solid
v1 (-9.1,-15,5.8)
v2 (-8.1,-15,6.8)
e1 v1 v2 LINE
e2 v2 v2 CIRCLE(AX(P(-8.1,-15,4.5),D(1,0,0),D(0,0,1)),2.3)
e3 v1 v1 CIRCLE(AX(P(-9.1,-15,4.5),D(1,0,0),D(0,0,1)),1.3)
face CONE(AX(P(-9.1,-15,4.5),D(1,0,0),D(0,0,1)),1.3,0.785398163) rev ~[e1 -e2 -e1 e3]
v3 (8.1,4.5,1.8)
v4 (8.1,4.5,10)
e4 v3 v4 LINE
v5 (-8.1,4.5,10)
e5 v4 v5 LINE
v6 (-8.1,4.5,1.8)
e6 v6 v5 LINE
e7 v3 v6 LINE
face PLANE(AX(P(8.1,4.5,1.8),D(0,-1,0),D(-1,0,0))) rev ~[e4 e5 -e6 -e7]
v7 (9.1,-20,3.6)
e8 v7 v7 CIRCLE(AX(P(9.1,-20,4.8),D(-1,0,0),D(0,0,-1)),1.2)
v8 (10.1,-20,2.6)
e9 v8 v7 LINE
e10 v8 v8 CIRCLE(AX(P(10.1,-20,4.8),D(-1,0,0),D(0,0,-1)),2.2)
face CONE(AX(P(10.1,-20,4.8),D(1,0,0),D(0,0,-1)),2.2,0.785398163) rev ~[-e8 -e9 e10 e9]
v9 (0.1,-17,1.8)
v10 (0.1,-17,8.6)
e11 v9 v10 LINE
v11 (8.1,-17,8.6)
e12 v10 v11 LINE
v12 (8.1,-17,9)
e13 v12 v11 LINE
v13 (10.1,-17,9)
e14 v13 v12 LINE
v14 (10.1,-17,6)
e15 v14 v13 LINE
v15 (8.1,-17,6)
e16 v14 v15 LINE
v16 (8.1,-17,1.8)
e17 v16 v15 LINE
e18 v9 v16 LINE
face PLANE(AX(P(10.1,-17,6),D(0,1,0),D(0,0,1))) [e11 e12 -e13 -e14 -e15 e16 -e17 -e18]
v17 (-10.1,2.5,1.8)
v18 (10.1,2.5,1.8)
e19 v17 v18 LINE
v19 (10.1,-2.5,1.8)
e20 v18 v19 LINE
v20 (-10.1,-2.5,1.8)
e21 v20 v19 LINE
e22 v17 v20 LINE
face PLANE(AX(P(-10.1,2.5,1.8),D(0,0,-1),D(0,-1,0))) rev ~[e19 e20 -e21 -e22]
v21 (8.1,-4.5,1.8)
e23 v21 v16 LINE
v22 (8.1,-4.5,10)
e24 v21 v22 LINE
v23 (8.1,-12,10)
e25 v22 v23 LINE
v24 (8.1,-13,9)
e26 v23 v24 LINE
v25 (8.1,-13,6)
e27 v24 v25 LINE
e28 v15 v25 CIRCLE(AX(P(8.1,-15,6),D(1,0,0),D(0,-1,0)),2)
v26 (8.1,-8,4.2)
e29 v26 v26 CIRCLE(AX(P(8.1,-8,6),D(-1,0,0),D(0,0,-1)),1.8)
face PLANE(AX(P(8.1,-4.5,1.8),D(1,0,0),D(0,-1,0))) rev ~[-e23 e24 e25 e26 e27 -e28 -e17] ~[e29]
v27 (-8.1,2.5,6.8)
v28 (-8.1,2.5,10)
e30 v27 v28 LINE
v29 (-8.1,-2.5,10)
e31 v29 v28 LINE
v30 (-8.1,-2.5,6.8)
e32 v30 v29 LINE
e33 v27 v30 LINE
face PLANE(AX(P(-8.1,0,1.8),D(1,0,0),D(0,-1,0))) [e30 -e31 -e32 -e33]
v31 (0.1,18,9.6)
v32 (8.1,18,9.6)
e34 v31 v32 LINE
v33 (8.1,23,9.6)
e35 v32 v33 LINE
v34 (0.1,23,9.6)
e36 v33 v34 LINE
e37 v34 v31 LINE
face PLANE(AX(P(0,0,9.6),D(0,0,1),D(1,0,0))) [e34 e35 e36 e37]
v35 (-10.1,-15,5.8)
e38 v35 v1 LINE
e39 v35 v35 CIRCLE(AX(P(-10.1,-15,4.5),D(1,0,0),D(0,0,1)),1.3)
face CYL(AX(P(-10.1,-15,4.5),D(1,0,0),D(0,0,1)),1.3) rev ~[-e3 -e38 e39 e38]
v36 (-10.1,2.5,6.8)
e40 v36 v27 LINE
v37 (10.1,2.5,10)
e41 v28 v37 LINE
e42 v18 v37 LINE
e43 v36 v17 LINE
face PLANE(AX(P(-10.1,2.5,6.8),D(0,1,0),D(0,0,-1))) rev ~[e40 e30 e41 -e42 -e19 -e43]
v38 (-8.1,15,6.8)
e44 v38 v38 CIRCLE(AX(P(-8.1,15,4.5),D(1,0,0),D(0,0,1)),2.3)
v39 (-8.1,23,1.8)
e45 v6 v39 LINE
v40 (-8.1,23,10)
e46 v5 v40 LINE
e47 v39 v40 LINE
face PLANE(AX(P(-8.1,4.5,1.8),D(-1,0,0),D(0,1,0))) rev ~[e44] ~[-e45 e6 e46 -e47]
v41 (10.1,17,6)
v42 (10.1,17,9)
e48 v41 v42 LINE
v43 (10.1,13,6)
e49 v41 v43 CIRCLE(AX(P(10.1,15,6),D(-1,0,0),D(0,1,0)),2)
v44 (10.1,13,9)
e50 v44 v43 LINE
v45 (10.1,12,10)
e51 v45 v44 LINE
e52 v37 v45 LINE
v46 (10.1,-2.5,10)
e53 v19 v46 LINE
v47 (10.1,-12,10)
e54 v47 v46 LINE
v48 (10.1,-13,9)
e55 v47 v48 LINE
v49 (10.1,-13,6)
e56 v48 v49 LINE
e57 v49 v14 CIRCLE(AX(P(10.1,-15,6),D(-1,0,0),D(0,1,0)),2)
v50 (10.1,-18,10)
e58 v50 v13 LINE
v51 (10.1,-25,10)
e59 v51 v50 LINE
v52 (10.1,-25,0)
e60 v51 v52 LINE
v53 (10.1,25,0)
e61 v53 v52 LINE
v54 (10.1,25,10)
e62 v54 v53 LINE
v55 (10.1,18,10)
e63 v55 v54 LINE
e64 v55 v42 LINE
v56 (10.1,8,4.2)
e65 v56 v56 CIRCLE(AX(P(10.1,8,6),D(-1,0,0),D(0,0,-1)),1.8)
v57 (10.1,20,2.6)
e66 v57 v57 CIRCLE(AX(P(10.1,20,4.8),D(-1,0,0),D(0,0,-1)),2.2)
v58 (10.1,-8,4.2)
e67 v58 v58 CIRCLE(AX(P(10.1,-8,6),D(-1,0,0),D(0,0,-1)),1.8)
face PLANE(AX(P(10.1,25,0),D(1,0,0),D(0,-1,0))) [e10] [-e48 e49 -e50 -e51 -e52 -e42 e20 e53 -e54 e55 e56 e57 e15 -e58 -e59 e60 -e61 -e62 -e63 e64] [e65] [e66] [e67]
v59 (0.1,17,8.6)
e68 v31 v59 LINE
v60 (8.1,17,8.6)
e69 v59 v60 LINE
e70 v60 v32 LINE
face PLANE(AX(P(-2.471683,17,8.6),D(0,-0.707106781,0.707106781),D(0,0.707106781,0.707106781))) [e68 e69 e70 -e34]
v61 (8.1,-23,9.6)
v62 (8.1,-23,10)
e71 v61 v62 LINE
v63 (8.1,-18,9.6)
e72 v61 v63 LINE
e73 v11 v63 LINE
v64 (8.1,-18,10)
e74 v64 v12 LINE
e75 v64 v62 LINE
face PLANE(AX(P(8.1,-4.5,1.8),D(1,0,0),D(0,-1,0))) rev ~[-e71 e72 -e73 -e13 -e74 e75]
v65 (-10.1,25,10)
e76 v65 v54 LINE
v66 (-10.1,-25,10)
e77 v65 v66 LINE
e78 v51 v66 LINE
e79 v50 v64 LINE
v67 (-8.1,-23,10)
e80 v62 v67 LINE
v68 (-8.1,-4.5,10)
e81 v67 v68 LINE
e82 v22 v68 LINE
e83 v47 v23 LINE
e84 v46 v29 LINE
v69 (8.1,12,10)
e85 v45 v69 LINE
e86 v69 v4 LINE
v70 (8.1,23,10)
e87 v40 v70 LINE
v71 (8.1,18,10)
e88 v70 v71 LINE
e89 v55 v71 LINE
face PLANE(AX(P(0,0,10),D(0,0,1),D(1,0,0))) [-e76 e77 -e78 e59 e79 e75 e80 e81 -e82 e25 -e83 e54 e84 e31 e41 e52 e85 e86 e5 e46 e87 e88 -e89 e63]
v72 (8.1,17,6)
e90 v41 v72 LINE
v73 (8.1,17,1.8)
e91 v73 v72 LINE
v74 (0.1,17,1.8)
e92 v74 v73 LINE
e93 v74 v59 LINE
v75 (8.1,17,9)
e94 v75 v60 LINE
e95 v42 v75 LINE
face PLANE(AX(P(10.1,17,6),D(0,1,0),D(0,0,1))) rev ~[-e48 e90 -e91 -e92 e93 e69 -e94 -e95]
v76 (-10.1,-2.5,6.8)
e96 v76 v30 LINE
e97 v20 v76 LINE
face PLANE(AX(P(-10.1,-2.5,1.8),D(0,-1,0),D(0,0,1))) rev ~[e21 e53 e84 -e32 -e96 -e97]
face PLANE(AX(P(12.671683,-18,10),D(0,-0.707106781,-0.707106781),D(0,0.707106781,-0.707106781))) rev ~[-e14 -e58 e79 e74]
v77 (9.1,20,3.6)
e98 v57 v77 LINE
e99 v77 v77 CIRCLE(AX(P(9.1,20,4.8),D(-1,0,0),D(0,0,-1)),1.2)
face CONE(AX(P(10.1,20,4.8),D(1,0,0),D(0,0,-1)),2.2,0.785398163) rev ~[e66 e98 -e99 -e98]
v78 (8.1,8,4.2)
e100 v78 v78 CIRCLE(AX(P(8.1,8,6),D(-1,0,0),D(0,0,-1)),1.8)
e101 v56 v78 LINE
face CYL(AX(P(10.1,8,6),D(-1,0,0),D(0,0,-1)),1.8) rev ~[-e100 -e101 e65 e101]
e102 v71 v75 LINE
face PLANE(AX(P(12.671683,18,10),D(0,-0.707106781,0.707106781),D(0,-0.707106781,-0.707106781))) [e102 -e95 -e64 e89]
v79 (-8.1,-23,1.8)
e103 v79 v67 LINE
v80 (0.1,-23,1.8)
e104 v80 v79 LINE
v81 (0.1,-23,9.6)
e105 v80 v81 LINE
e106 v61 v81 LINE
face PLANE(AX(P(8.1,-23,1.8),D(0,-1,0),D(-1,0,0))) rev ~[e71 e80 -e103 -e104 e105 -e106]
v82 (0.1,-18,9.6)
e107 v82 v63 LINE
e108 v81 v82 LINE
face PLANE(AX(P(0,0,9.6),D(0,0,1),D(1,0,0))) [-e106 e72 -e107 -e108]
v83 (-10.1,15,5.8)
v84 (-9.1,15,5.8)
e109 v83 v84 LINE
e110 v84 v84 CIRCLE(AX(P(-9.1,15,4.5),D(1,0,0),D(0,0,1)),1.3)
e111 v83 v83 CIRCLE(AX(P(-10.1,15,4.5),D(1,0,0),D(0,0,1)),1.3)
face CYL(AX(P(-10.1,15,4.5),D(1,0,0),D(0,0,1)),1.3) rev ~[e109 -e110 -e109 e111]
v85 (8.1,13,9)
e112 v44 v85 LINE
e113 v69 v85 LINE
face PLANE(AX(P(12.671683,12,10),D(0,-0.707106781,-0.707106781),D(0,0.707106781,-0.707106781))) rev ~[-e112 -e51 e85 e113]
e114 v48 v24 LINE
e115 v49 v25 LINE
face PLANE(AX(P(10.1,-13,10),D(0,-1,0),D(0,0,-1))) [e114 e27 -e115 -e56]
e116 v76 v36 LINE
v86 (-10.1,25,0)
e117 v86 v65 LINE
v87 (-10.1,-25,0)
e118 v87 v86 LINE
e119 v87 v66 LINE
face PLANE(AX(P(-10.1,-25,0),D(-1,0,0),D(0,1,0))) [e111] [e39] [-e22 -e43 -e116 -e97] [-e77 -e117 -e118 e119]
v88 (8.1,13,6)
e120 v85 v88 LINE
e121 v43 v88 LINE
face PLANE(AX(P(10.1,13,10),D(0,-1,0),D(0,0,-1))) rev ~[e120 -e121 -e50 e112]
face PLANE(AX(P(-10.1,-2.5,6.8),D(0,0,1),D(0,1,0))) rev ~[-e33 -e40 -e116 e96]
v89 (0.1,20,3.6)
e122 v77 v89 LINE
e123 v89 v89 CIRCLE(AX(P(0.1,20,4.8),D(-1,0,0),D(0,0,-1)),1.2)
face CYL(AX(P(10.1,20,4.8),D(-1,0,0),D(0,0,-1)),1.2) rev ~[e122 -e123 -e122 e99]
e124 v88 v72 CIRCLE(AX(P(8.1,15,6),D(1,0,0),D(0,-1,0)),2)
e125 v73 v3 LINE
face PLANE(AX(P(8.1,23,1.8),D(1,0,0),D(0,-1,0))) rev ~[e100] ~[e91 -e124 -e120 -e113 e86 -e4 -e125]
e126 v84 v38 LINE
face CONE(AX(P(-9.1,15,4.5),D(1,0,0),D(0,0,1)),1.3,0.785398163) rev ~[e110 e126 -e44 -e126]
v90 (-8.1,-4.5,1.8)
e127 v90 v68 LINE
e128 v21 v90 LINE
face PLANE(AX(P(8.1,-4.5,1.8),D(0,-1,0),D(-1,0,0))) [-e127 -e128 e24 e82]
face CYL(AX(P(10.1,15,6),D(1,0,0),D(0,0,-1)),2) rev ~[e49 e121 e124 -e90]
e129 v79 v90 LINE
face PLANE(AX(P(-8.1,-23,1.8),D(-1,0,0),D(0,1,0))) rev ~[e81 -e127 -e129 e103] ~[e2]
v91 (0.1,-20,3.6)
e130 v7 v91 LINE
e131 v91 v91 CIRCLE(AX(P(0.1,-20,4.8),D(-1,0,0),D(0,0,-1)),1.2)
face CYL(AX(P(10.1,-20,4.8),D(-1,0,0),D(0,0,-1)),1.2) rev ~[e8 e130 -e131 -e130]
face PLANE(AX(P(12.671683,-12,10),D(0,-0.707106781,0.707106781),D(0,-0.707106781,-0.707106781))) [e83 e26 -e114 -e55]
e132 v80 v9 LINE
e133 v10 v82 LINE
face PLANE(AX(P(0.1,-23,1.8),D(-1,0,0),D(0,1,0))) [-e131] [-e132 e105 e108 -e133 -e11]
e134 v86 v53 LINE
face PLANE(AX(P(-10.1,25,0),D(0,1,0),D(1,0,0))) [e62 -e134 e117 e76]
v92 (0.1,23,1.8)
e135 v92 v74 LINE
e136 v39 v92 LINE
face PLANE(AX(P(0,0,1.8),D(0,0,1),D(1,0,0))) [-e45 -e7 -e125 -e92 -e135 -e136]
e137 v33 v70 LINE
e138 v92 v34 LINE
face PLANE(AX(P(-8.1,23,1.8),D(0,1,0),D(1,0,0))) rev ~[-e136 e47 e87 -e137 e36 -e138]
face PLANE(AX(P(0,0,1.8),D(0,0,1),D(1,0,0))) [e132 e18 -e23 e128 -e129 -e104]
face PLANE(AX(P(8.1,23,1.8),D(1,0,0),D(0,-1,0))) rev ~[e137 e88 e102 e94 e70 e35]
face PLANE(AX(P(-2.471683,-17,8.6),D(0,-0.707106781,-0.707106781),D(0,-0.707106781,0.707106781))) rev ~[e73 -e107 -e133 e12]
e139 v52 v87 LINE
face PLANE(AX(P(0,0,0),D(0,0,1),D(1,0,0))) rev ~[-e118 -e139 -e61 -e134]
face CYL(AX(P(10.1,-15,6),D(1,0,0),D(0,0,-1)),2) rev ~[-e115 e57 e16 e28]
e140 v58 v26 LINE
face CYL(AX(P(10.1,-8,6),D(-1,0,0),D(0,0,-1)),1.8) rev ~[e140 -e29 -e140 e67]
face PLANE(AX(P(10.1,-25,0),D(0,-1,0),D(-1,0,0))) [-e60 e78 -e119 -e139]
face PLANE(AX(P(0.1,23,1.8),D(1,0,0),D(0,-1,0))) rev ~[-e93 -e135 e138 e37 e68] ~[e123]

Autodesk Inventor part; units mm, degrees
ref_plane "YZ Plane" through (0, 0, 0) normal (1, 0, 0) x (0, 1, 0)
ref_plane "XZ Plane" through (0, 0, 0) normal (0, 1, 0) x (-1, 0, 0)
ref_plane "XY Plane" through (0, 0, 0) normal (0, 0, 1) x (1, 0, 0)
sketch "Sketch3" plane through (0, 0, 0) normal (0, 0, 1) x (1, 0, 0)
  line L0 (-10.1, 25) -> (10.1, 25)
  line L1 (10.1, 25) -> (10.1, -25)
  line L2 (10.1, -25) -> (-10.1, -25)
  line L3 (-10.1, -25) -> (-10.1, 25)
  point P0 (0, 0)
  dimension "d26" = 20.2
  dimension "d27" = 50
extrude "Extrusion3" add sketch "Sketch3" along normal blind 1.8
sketch "Sketch4" plane through (0, 0, 1.8) normal (0, 0, 1) x (1, 0, 0)
  line L0 (-8.1, 23) -> (8.1, 23)
  line L1 (8.1, -23) -> (-8.1, -23)
  line L2 (-8.1, 0) -> (-8.1, 2.5)
  line L3 (-8.1, 2.5) -> (8.1, 2.5)
  line L4 (8.1, 4.5) -> (-8.1, 4.5)
  line L5 (-8.1, 0) -> (-8.1, -2.5)
  line L6 (-8.1, -2.5) -> (8.1, -2.5)
  line L7 (8.1, -4.5) -> (-8.1, -4.5)
  line L8 (-8.1, 4.5) -> (-8.1, 23)
  line L9 (8.1, 23) -> (8.1, 4.5)
  line L10 (8.1, 2.5) -> (8.1, -2.5)
  line L11 (8.1, -4.5) -> (8.1, -23)
  line L12 (-10.1, 25) -> (-10.1, -25) projected
  line L13 (10.1, -25) -> (10.1, 25) projected
  line L14 (-10.1, 25) -> (10.1, 25)
  line L15 (10.1, 25) -> (10.1, -25)
  line L16 (10.1, -25) -> (-10.1, -25)
  line L17 (-10.1, -25) -> (-10.1, 25)
  line L18 (-8.1, -23) -> (-8.1, -4.5)
  line L19 (-8.1, -2.5) -> (-8.1, 2.5)
  point P0 (0, 0)
  dimension "d39" = 2.5
  dimension "d40" = 2.5
  dimension "d44" = 2
  dimension "d45" = 2
  dimension "d48" = 2
  dimension "d49" = 2
  dimension "d50" = 2
  dimension "d51" = 2
  dimension "d52" = 2
  dimension "d53" = 2
  dimension "d56" = 2
  dimension "d57" = 2
extrude "Extrusion4" add sketch "Sketch4" along normal blind 8.2
sketch "Sketch5" plane through (10.1, -25, 0) normal (1, 0, 0) x (0, 0, -1)
  line L0 (-1.8, 27.5) -> (-10, 27.5) projected
  line L1 (-1.8, 22.5) -> (-10, 22.5) projected
  line L2 (-10, 27.5) -> (-1.8, 27.5)
  line L3 (-1.8, 27.5) -> (-1.8, 22.5)
  line L4 (-1.8, 22.5) -> (-10, 22.5)
  line L5 (-10, 22.5) -> (-10, 27.5)
  point P0 (0, 25)
extrude "Extrusion5" cut sketch "Sketch5" against normal blind 8.2
sketch "Sketch6" plane through (-10.1, -25, 0) normal (-1, 0, 0) x (0, 0, 1)
  line L0 (1.8, 27.5) -> (1.8, 22.5) projected
  line L1 (1.8, 22.5) -> (6.8, 22.5)
  line L2 (6.8, 22.5) -> (6.8, 27.5)
  line L3 (6.8, 27.5) -> (1.8, 27.5)
  line L4 (1.8, 27.5) -> (1.8, 22.5)
  point P0 (0, 25)
  dimension "d60" = 5
  dimension "d61" = 5
extrude "Extrusion6" cut sketch "Sketch6" against normal blind 8.2
sketch "Sketch10" plane through (-10.1, -25, 0) normal (-1, 0, 0) x (0, 0, 1)
  line L0 (0, 0) -> (0, 50) projected
  line L1 (0, 0) -> (10, 0) projected
  point P0 (0, 25)
  point P1 (4.5, 10)
  point P2 (4.5, 40)
hole "Hole6" at (-10.1, -15, 4.5) at (-10.1, 15, 4.5) direction (1, 0, 0) diameter 2.6 depth 2 tip angle 118
sketch "Sketch11" plane through (0, 0, 1.8) normal (0, 0, 1) x (1, 0, 0)
  line L0 (8.1, -23) -> (8.1, -4.5) projected
  line L1 (8.1, -23) -> (0.1, -23)
  line L2 (0.1, -23) -> (0.1, -17)
  line L3 (0.1, -17) -> (8.1, -17)
  line L4 (8.1, -17) -> (8.1, -23)
  line L5 (10.1, 25) -> (10.1, -25) projected
  line L6 (8.1, 23) -> (0.1, 23)
  line L7 (0.1, 23) -> (0.1, 17)
  line L8 (0.1, 17) -> (8.1, 17)
  line L9 (8.1, 17) -> (8.1, 23)
  point P0 (0, 0)
  dimension "d143" = 8
  dimension "d144" = 6
extrude "Extrusion9" add sketch "Sketch11" along normal blind 7.8
sketch "Sketch12" plane through (10.1, -25, 0) normal (1, 0, 0) x (0, 0, -1)
  line L0 (0, 50) -> (0, 0) projected
  line L1 (0, 0) -> (-10, 0) projected
  circle A0 centre (-6, 10) radius 2
  line L2 (-1.8, 8) -> (-9.6, 8) projected
  line L3 (-10, 20.5) -> (-10, 2) projected
  line L4 (-6, 8) -> (-10, 8)
  line L5 (-10, 8) -> (-10, 12)
  line L6 (-10, 12) -> (-6, 12)
  line L7 (-6, 12) -> (-6, 8)
  line L8 (0, 25) -> (-4.8, 25)
  circle A1 centre (-6, 40) radius 2
  line L9 (-1.8, 42) -> (-9.6, 42)
  line L10 (-6, 42) -> (-10, 42)
  line L11 (-10, 42) -> (-10, 38)
  line L12 (-10, 38) -> (-6, 38)
  line L13 (-6, 38) -> (-6, 42)
  point P0 (-4.8, 5)
  point P1 (-6, 17)
  point P2 (-4.8, 45)
  point P3 (-6, 33)
  dimension "d153" = 4
hole "Hole7" at (10.1, -20, 4.8) at (10.1, 20, 4.8) direction (-1, 0, 0) diameter 2.4 depth 10 tip angle 118
hole "Hole8" at (10.1, -8, 6) at (10.1, 8, 6) direction (-1, 0, 0) diameter 3.6 depth 2 tip angle 118
extrude "Extrusion10" cut sketch "Sketch12" against normal blind 2
chamfer "Chamfer4" distance 1 angle 45 10 edges at (10.1, -20, 6) (-8.1, -15, 3.2) (10.1, 20, 6) (-8.1, 15, 3.2) (4.1, -17, 9.6) (4.1, 17, 9.6) (9.1, -17, 10) (9.1, 17, 10) (9.1, 13, 10) (9.1, -13, 10)
properties part number "digit_holder_A_no_hole"
